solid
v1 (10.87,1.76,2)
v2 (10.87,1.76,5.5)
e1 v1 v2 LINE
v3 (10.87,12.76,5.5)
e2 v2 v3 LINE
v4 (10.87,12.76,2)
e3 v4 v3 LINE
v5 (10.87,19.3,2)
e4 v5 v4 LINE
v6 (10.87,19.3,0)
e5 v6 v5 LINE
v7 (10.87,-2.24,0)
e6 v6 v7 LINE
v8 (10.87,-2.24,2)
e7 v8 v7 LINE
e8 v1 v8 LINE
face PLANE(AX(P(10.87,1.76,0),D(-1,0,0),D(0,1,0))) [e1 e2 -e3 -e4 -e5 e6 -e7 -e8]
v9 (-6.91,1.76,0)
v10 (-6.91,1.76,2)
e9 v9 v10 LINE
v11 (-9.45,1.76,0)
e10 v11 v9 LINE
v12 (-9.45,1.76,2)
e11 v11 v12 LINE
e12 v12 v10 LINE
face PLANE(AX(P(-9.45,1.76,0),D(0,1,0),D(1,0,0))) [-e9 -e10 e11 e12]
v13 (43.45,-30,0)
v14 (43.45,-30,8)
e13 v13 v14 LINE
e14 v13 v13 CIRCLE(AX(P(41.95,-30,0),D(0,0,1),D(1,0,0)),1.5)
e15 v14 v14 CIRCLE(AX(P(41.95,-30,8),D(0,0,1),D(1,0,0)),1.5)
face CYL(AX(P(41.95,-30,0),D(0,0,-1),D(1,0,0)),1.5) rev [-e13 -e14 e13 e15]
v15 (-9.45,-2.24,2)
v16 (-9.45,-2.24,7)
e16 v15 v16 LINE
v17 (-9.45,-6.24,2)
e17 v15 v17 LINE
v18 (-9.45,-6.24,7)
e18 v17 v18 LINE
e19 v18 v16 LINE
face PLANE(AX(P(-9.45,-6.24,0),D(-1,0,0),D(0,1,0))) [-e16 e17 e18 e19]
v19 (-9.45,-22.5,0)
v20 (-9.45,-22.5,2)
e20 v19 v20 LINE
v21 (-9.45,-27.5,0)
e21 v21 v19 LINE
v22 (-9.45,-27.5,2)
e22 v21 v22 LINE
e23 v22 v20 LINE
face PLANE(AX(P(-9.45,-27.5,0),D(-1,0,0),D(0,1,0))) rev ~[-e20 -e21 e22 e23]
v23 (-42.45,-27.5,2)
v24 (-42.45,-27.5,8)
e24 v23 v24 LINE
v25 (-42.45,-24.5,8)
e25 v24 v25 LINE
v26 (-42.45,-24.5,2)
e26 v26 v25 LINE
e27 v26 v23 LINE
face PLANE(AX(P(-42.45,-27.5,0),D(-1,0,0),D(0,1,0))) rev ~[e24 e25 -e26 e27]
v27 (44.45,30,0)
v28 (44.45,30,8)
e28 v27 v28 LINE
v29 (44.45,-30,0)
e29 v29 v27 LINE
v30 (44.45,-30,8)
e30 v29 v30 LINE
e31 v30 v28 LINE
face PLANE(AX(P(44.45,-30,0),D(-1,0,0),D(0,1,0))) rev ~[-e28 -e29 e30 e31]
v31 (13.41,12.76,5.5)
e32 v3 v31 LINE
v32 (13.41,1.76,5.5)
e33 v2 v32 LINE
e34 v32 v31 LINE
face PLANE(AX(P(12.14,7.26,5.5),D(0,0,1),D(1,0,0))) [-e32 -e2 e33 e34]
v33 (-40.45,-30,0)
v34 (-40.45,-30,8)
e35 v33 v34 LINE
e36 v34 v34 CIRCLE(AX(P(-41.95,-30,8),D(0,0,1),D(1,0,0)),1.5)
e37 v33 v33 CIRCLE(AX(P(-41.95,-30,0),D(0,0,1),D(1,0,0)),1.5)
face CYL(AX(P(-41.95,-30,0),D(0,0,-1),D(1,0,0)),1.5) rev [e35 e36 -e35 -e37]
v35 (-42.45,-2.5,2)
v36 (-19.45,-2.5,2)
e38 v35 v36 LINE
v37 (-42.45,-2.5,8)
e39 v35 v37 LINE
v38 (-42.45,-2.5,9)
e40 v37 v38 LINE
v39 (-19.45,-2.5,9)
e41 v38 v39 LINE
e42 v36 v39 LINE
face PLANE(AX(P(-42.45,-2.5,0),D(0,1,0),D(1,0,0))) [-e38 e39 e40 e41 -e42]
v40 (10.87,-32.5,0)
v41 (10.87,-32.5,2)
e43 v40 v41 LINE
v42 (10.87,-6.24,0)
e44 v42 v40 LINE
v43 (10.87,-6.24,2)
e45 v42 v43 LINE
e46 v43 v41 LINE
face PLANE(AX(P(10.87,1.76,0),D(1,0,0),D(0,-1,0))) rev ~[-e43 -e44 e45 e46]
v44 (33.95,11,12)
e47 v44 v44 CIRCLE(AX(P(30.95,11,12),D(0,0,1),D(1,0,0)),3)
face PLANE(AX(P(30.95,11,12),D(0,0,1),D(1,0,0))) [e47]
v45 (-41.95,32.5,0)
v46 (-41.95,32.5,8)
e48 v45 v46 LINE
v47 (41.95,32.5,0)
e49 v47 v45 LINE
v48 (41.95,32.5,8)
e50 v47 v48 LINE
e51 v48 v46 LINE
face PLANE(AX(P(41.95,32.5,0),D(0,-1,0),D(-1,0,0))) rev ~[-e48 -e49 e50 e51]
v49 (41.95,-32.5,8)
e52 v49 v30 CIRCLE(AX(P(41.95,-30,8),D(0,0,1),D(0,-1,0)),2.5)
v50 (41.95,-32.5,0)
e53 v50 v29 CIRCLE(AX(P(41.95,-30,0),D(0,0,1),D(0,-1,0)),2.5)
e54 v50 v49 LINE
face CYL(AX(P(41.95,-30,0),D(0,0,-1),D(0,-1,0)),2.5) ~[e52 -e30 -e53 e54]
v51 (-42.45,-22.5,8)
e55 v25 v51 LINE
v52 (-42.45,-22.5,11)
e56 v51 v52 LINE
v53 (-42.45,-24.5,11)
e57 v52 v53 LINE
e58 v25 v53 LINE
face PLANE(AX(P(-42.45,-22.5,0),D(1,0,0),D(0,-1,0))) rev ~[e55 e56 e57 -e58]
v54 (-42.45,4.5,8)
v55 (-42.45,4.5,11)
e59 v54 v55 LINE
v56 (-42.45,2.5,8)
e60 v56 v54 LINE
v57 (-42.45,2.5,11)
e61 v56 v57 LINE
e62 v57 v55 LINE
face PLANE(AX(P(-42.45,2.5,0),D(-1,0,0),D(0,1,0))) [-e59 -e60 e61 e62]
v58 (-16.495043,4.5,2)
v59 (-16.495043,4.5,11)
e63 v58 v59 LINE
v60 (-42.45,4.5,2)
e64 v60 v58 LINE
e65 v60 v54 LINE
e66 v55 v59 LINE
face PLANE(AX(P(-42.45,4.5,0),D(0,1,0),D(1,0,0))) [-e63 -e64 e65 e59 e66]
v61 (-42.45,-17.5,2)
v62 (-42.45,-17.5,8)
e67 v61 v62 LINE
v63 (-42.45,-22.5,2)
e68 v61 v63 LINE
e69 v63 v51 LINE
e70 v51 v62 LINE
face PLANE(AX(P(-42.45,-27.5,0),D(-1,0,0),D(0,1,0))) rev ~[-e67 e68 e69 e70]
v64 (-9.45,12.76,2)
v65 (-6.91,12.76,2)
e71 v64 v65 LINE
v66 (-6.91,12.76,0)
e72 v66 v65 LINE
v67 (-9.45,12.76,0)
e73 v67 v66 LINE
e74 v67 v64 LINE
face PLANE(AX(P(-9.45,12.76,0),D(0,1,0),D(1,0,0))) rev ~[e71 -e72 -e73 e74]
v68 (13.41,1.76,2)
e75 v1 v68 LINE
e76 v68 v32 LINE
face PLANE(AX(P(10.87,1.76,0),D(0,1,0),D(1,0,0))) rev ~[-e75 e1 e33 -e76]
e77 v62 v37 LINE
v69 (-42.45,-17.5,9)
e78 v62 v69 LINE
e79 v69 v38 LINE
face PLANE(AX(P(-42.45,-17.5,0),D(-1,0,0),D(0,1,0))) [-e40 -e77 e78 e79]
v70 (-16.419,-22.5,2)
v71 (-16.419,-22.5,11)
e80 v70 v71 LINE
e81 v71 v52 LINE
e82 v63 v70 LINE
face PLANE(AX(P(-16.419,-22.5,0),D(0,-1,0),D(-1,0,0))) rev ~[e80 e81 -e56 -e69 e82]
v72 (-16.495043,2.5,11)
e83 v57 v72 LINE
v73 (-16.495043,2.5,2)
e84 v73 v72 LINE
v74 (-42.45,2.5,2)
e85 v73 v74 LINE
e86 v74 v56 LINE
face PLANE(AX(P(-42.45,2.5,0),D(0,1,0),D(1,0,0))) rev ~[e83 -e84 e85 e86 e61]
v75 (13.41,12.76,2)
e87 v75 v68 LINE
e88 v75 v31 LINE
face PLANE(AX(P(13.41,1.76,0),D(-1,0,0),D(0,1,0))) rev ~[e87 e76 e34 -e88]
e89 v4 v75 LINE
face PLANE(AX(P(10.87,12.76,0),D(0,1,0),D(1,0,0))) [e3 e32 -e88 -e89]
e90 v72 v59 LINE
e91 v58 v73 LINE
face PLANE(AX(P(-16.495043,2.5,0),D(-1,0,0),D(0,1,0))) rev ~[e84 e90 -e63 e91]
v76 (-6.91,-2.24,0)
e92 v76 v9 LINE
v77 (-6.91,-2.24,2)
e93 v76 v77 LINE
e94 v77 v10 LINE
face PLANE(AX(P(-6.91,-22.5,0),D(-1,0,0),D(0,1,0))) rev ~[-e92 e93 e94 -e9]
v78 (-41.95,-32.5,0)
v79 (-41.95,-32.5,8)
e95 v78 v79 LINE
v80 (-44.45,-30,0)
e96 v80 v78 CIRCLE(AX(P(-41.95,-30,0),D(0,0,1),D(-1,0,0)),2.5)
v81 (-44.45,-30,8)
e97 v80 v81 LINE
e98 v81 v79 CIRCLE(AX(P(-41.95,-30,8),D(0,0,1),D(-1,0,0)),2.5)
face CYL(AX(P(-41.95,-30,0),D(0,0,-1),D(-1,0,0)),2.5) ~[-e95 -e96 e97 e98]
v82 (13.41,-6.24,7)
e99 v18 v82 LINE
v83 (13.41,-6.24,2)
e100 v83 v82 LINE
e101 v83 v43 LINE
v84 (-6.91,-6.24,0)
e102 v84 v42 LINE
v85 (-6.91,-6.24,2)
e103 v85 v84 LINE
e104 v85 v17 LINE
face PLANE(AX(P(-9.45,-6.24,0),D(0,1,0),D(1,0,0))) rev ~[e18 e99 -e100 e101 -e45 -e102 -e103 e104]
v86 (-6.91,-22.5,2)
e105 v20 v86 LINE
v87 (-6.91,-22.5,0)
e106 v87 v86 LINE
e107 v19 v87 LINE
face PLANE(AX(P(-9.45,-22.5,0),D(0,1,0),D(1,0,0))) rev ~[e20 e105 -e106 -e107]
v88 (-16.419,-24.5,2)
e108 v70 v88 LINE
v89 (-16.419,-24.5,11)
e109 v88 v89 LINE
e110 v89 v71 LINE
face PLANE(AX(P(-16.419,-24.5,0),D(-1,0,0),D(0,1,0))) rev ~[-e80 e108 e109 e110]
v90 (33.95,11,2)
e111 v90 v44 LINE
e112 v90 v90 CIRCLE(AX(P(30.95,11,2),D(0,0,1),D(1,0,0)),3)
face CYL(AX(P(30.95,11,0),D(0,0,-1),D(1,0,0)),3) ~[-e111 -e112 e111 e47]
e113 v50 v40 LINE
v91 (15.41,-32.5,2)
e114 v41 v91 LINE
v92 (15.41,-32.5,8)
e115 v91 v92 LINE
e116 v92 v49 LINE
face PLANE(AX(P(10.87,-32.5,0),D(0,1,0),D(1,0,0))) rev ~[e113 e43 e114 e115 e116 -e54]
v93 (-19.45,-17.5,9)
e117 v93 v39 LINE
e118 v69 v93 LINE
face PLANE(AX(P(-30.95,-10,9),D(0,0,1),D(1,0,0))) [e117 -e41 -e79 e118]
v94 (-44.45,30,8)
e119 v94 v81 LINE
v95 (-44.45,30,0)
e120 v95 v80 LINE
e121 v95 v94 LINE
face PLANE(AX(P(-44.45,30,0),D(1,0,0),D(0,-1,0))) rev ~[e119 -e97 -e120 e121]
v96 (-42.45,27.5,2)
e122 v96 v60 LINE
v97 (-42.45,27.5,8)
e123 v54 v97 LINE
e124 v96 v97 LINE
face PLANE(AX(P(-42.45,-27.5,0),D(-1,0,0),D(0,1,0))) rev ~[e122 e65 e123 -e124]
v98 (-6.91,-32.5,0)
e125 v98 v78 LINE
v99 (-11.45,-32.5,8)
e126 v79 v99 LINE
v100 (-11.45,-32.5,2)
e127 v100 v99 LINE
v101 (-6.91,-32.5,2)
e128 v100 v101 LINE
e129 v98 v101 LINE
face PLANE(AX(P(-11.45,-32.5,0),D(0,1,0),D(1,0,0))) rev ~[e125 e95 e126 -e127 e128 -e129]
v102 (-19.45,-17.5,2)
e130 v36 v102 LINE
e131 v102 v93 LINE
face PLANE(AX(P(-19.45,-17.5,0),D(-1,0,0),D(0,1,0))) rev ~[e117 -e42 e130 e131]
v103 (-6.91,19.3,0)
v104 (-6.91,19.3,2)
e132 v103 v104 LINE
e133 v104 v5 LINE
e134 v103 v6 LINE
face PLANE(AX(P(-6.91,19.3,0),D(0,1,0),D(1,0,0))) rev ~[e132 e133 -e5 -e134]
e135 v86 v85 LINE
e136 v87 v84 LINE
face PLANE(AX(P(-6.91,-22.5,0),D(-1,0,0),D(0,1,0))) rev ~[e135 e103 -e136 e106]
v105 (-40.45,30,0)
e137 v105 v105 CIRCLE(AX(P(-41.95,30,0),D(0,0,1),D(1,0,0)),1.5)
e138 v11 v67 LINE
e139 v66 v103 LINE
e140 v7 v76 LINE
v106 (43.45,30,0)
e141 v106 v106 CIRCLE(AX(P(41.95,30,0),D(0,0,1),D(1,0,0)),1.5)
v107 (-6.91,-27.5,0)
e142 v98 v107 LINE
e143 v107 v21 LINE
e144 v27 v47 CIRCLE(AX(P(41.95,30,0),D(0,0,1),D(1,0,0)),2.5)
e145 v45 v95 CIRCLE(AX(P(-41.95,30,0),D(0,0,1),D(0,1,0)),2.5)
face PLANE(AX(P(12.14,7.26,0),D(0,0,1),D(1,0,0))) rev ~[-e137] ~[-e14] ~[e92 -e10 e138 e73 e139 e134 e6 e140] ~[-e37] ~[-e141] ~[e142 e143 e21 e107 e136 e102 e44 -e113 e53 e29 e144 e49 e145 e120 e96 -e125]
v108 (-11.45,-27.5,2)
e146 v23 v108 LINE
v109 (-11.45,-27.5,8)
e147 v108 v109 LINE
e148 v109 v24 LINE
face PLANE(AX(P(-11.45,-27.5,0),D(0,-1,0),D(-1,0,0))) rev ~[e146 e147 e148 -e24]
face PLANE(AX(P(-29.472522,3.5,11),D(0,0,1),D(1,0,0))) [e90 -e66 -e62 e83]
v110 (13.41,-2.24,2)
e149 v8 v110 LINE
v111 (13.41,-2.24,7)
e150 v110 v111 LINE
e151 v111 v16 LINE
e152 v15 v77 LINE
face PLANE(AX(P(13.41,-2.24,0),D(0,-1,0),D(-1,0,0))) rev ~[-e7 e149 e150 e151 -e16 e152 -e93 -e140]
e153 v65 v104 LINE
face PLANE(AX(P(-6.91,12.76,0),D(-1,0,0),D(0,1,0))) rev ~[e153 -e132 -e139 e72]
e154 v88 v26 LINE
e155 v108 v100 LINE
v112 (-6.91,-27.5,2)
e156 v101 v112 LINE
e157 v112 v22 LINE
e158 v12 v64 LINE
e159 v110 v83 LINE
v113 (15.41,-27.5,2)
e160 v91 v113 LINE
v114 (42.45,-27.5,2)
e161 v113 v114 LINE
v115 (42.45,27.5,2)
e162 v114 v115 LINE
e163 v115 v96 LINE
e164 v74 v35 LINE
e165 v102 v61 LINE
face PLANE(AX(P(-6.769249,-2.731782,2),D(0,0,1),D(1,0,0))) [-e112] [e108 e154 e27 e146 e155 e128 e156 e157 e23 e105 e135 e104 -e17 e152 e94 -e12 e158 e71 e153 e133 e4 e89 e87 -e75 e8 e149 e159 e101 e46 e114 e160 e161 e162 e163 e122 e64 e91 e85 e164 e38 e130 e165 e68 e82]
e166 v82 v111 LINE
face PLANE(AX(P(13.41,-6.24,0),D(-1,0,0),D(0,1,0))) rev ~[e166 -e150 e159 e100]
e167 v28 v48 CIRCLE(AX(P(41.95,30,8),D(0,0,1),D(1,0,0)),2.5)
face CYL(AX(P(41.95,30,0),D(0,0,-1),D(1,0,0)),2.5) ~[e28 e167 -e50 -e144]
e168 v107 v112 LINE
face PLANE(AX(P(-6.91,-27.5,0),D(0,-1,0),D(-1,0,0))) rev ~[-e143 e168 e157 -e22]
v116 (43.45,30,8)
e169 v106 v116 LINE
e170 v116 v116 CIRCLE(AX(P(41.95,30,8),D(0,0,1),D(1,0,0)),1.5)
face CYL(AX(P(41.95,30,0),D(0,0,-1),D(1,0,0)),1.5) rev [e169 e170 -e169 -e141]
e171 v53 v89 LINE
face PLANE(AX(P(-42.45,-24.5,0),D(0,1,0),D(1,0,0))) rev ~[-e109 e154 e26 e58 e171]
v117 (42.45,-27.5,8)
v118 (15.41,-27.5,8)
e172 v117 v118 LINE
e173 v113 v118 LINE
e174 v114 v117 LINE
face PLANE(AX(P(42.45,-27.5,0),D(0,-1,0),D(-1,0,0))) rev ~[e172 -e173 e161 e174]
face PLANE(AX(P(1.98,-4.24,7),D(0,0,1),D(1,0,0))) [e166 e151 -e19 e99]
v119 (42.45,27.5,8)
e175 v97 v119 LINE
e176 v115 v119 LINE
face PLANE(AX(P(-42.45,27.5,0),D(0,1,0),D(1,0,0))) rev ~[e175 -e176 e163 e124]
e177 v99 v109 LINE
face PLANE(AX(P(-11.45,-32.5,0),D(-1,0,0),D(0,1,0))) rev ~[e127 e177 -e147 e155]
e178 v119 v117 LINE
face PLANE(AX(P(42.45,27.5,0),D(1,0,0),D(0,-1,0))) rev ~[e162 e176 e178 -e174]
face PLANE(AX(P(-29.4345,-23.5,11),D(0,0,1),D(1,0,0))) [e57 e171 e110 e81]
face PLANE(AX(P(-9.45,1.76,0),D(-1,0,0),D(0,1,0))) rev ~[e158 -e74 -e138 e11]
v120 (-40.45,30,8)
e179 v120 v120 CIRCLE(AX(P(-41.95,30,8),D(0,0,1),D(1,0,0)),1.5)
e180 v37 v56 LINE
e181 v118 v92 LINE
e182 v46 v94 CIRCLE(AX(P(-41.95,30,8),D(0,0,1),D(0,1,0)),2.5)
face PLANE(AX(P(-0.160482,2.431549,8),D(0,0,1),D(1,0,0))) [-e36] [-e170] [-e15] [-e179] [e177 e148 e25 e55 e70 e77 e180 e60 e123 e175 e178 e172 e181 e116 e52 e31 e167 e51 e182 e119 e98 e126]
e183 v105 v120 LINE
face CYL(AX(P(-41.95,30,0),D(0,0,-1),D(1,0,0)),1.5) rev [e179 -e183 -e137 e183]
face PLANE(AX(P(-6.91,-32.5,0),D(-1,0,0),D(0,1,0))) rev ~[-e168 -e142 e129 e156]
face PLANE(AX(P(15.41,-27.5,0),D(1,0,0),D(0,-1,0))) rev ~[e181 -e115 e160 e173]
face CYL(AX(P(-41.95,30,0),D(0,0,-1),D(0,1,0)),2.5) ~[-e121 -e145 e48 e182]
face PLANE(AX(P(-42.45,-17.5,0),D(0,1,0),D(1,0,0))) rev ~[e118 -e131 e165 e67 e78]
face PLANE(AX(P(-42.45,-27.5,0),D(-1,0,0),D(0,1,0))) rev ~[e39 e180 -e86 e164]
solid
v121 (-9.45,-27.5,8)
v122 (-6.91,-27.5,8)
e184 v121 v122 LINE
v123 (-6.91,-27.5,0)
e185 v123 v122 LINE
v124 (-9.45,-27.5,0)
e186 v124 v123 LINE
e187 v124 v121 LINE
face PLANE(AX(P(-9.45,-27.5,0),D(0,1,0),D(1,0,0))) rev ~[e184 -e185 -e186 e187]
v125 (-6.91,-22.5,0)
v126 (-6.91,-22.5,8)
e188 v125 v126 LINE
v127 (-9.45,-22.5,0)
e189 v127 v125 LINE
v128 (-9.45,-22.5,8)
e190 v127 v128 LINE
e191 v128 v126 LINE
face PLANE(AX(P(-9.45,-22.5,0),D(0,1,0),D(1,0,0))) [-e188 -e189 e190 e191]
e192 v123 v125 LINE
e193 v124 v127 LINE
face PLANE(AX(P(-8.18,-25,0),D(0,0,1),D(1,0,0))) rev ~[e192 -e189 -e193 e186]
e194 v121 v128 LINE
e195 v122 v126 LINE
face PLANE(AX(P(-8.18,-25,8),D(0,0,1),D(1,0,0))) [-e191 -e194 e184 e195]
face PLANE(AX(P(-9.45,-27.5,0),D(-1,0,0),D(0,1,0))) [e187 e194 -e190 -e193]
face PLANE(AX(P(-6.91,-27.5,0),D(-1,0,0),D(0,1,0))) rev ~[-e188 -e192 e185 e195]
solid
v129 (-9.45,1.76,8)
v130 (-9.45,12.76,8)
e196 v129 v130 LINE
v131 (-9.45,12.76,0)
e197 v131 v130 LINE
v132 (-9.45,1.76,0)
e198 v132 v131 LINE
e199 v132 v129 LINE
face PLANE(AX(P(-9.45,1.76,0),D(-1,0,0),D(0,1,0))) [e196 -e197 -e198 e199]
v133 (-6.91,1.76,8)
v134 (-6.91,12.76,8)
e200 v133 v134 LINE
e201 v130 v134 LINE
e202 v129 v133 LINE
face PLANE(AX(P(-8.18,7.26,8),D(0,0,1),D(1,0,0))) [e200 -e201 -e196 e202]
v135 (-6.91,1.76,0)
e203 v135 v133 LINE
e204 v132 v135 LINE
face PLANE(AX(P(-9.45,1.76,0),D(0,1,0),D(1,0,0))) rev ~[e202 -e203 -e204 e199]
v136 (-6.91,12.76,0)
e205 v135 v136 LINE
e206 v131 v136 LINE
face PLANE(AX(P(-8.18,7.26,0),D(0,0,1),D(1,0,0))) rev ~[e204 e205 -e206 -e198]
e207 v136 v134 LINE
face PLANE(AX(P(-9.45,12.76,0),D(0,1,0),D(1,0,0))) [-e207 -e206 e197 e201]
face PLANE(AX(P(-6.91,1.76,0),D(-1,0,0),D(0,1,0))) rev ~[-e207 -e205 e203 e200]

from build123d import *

# Parameters (mm, degrees)
F0_R     = 1.5
F1_DEPTH = 8
F0_W     = 2.54
F0_H     = 11
F0_H_2   = 5
F0_R_2   = 3
F0_H_3   = 16.26
F0_H_4   = 4
F2_DEPTH = 2
F0_W_2   = 23
F0_H_5   = 15
F3_DEPTH = 9
F0_W_3   = 25.9549565881
F0_H_6   = 2
F4_DEPTH = 11
F0_W_4   = 17.78
F5_DEPTH = 7
F6_DEPTH = 5.5
F7_DEPTH = 12


# Not quite as in the source:
# - a feature names something its author has since deleted; it is built from what else it names


with BuildPart() as f1:
    # F0 (on Top) → F1 (new body)
    with BuildSketch(Plane.XY):
        with BuildLine():
            Line((-42.45, 27.5), (42.45, 27.5))
            Line((42.45, 27.5), (42.45, 0.5))
            Line((42.45, 0.5), (42.45, -20.5))
            Line((42.45, -20.5), (42.45, -27.5))
            Line((42.45, -27.5), (15.41, -27.5))
            Line((15.41, -27.5), (15.41, -32.5))
            Line((15.41, -32.5), (41.95, -32.5))
            ThreePointArc((41.95, -32.5), (43.717766953, -31.767766953), (44.45, -30))
            Line((44.45, -30), (44.45, -27.5))
            Line((44.45, -27.5), (44.45, 27.5))
            Line((44.45, 27.5), (44.45, 30))
            ThreePointArc((44.45, 30), (43.717766953, 31.767766953), (41.95, 32.5))
            Line((41.95, 32.5), (-41.95, 32.5))
            ThreePointArc((-41.95, 32.5), (-43.717766953, 31.767766953), (-44.45, 30))
            Line((-44.45, 30), (-44.45, 27.5))
            Line((-44.45, 27.5), (-44.45, -27.5))
            Line((-44.45, -27.5), (-44.45, -30))
            ThreePointArc((-44.45, -30), (-43.717766953, -31.767766953), (-41.95, -32.5))
            Line((-41.95, -32.5), (-11.45, -32.5))
            Line((-11.45, -32.5), (-11.45, -27.5))
            Line((-11.45, -27.5), (-42.45, -27.5))
            Line((-42.45, -27.5), (-42.45, -24.5))
            Line((-42.45, -24.5), (-42.45, -22.5))
            Line((-42.45, -22.5), (-42.45, -20.5))
            Line((-42.45, -20.5), (-42.45, -17.5))
            Line((-42.45, -17.5), (-42.45, -2.5))
            Line((-42.45, -2.5), (-42.45, 0.5))
            Line((-42.45, 0.5), (-42.45, 2.5))
            Line((-42.45, 2.5), (-42.45, 4.5))
            Line((-42.45, 4.5), (-42.45, 27.5))
        make_face()
        with Locations((-41.95, -30)):
            Circle(F0_R, mode=Mode.SUBTRACT)
        with Locations((41.95, -30)):
            Circle(F0_R, mode=Mode.SUBTRACT)
        with Locations((-41.95, 30)):
            Circle(F0_R, mode=Mode.SUBTRACT)
        with Locations((41.95, 30)):
            Circle(F0_R, mode=Mode.SUBTRACT)
    extrude(amount=F1_DEPTH)

    # F0 (on Top) → F2 (join)
    with BuildSketch(Plane.XY):
        Polygon((42.45, 0.5), (42.45, 27.5), (-42.45, 27.5), (-42.45, 4.5), (-16.4950434119, 4.5), (-16.4950434119, 2.5), (-42.45, 2.5), (-42.45, 0.5), (-16.45, 0.5), (-16.45, -20.5), (-42.45, -20.5), (-42.45, -22.5), (-16.4950434119, -22.5), (-16.419, -22.5), (-16.419, -24.5), (-42.45, -24.5), (-42.45, -27.5), (-11.45, -27.5), (-11.45, -32.5), (-9.45, -32.5), (-9.45, -27.5), (-9.45, -22.5), (-9.45, -6.24), (-9.45, -2.24), (-9.45, 1.76), (-9.45, 12.76), (-9.45, 18.3), (-6.91, 18.3), (-6.91, 19.3), (10.87, 19.3), (10.87, 18.3), (13.41, 18.3), (13.41, 12.76), (13.41, 1.76), (13.41, -2.24), (13.41, -6.24), (13.41, -32.5), (15.41, -32.5), (15.41, -27.5), (42.45, -27.5), (42.45, -20.5), align=None)
        with Locations((30.95, 11)):
            Circle(F0_R_2, mode=Mode.SUBTRACT)
        Polygon((-16.45, 0.5), (-42.45, 0.5), (-42.45, -2.5), (-19.45, -2.5), (-19.45, -17.5), (-42.45, -17.5), (-42.45, -20.5), (-16.45, -20.5), align=None)
        with Locations((-8.18, -14.37)):
            Rectangle(F0_W, F0_H_3)
        with Locations((-8.18, -4.24)):
            Rectangle(F0_W, F0_H_4)
        with Locations((-8.18, -0.24)):
            Rectangle(F0_W, F0_H_4)
        Polygon((-9.45, 12.76), (-6.91, 12.76), (-6.91, 15.76), (-6.91, 18.3), (-9.45, 18.3), align=None)
        Polygon((-9.45, -32.5), (-6.91, -32.5), (-6.91, -29.96), (-6.91, -27.5), (-9.45, -27.5), align=None)
        Polygon((10.87, -32.5), (13.41, -32.5), (13.41, -6.24), (10.87, -6.24), (10.87, -29.96), align=None)
        with Locations((12.14, -4.24)):
            Rectangle(F0_W, F0_H_4)
        Polygon((10.87, 12.76), (13.41, 12.76), (13.41, 18.3), (10.87, 18.3), (10.87, 15.76), align=None)
        with Locations((12.14, -0.24)):
            Rectangle(F0_W, F0_H_4)
    extrude(amount=F2_DEPTH)

    # F0 (on Top) → F3 (join)
    with BuildSketch(Plane.XY):
        with Locations((-30.95, -10)):
            Rectangle(F0_W_2, F0_H_5)
    extrude(amount=F3_DEPTH)

    # F0 (on Top) → F4 (join)
    with BuildSketch(Plane.XY):
        with Locations((-29.4725217059, 3.5)):
            Rectangle(F0_W_3, F0_H_6)
        Polygon((-16.4950434119, -22.5), (-42.45, -22.5), (-42.45, -24.5), (-16.419, -24.5), (-16.419, -22.5), align=None)
    extrude(amount=F4_DEPTH)

    # F0 (on Top) → F5 (join)
    with BuildSketch(Plane.XY):
        with Locations((1.98, -4.24)):
            Rectangle(F0_W_4, F0_H_4)
        with Locations((12.14, -4.24)):
            Rectangle(F0_W, F0_H_4)
        with Locations((-8.18, -4.24)):
            Rectangle(F0_W, F0_H_4)
    extrude(amount=F5_DEPTH)

    # F0 (on Top) → F6 (join)
    with BuildSketch(Plane.XY):
        with Locations((12.14, 7.26)):
            Rectangle(F0_W, F0_H)
    extrude(amount=F6_DEPTH)

    # F0 (on Top) → F7 (join)
    with BuildSketch(Plane.XY):
        with Locations((30.95, 11)):
            Circle(F0_R_2)
    extrude(amount=F7_DEPTH)


with BuildPart() as f1b:
    # F0 (on Top) → F1, piece 2 (new body)
    with BuildSketch(Plane.XY):
        with Locations((-8.18, 7.26)):
            Rectangle(F0_W, F0_H)
    extrude(amount=F1_DEPTH)


with BuildPart() as f1c:
    # F0 (on Top) → F1, piece 3 (new body)
    with BuildSketch(Plane.XY):
        with Locations((-8.18, -25)):
            Rectangle(F0_W, F0_H_2)
    extrude(amount=F1_DEPTH)


solid = Compound([f1.part, f1b.part, f1c.part])
